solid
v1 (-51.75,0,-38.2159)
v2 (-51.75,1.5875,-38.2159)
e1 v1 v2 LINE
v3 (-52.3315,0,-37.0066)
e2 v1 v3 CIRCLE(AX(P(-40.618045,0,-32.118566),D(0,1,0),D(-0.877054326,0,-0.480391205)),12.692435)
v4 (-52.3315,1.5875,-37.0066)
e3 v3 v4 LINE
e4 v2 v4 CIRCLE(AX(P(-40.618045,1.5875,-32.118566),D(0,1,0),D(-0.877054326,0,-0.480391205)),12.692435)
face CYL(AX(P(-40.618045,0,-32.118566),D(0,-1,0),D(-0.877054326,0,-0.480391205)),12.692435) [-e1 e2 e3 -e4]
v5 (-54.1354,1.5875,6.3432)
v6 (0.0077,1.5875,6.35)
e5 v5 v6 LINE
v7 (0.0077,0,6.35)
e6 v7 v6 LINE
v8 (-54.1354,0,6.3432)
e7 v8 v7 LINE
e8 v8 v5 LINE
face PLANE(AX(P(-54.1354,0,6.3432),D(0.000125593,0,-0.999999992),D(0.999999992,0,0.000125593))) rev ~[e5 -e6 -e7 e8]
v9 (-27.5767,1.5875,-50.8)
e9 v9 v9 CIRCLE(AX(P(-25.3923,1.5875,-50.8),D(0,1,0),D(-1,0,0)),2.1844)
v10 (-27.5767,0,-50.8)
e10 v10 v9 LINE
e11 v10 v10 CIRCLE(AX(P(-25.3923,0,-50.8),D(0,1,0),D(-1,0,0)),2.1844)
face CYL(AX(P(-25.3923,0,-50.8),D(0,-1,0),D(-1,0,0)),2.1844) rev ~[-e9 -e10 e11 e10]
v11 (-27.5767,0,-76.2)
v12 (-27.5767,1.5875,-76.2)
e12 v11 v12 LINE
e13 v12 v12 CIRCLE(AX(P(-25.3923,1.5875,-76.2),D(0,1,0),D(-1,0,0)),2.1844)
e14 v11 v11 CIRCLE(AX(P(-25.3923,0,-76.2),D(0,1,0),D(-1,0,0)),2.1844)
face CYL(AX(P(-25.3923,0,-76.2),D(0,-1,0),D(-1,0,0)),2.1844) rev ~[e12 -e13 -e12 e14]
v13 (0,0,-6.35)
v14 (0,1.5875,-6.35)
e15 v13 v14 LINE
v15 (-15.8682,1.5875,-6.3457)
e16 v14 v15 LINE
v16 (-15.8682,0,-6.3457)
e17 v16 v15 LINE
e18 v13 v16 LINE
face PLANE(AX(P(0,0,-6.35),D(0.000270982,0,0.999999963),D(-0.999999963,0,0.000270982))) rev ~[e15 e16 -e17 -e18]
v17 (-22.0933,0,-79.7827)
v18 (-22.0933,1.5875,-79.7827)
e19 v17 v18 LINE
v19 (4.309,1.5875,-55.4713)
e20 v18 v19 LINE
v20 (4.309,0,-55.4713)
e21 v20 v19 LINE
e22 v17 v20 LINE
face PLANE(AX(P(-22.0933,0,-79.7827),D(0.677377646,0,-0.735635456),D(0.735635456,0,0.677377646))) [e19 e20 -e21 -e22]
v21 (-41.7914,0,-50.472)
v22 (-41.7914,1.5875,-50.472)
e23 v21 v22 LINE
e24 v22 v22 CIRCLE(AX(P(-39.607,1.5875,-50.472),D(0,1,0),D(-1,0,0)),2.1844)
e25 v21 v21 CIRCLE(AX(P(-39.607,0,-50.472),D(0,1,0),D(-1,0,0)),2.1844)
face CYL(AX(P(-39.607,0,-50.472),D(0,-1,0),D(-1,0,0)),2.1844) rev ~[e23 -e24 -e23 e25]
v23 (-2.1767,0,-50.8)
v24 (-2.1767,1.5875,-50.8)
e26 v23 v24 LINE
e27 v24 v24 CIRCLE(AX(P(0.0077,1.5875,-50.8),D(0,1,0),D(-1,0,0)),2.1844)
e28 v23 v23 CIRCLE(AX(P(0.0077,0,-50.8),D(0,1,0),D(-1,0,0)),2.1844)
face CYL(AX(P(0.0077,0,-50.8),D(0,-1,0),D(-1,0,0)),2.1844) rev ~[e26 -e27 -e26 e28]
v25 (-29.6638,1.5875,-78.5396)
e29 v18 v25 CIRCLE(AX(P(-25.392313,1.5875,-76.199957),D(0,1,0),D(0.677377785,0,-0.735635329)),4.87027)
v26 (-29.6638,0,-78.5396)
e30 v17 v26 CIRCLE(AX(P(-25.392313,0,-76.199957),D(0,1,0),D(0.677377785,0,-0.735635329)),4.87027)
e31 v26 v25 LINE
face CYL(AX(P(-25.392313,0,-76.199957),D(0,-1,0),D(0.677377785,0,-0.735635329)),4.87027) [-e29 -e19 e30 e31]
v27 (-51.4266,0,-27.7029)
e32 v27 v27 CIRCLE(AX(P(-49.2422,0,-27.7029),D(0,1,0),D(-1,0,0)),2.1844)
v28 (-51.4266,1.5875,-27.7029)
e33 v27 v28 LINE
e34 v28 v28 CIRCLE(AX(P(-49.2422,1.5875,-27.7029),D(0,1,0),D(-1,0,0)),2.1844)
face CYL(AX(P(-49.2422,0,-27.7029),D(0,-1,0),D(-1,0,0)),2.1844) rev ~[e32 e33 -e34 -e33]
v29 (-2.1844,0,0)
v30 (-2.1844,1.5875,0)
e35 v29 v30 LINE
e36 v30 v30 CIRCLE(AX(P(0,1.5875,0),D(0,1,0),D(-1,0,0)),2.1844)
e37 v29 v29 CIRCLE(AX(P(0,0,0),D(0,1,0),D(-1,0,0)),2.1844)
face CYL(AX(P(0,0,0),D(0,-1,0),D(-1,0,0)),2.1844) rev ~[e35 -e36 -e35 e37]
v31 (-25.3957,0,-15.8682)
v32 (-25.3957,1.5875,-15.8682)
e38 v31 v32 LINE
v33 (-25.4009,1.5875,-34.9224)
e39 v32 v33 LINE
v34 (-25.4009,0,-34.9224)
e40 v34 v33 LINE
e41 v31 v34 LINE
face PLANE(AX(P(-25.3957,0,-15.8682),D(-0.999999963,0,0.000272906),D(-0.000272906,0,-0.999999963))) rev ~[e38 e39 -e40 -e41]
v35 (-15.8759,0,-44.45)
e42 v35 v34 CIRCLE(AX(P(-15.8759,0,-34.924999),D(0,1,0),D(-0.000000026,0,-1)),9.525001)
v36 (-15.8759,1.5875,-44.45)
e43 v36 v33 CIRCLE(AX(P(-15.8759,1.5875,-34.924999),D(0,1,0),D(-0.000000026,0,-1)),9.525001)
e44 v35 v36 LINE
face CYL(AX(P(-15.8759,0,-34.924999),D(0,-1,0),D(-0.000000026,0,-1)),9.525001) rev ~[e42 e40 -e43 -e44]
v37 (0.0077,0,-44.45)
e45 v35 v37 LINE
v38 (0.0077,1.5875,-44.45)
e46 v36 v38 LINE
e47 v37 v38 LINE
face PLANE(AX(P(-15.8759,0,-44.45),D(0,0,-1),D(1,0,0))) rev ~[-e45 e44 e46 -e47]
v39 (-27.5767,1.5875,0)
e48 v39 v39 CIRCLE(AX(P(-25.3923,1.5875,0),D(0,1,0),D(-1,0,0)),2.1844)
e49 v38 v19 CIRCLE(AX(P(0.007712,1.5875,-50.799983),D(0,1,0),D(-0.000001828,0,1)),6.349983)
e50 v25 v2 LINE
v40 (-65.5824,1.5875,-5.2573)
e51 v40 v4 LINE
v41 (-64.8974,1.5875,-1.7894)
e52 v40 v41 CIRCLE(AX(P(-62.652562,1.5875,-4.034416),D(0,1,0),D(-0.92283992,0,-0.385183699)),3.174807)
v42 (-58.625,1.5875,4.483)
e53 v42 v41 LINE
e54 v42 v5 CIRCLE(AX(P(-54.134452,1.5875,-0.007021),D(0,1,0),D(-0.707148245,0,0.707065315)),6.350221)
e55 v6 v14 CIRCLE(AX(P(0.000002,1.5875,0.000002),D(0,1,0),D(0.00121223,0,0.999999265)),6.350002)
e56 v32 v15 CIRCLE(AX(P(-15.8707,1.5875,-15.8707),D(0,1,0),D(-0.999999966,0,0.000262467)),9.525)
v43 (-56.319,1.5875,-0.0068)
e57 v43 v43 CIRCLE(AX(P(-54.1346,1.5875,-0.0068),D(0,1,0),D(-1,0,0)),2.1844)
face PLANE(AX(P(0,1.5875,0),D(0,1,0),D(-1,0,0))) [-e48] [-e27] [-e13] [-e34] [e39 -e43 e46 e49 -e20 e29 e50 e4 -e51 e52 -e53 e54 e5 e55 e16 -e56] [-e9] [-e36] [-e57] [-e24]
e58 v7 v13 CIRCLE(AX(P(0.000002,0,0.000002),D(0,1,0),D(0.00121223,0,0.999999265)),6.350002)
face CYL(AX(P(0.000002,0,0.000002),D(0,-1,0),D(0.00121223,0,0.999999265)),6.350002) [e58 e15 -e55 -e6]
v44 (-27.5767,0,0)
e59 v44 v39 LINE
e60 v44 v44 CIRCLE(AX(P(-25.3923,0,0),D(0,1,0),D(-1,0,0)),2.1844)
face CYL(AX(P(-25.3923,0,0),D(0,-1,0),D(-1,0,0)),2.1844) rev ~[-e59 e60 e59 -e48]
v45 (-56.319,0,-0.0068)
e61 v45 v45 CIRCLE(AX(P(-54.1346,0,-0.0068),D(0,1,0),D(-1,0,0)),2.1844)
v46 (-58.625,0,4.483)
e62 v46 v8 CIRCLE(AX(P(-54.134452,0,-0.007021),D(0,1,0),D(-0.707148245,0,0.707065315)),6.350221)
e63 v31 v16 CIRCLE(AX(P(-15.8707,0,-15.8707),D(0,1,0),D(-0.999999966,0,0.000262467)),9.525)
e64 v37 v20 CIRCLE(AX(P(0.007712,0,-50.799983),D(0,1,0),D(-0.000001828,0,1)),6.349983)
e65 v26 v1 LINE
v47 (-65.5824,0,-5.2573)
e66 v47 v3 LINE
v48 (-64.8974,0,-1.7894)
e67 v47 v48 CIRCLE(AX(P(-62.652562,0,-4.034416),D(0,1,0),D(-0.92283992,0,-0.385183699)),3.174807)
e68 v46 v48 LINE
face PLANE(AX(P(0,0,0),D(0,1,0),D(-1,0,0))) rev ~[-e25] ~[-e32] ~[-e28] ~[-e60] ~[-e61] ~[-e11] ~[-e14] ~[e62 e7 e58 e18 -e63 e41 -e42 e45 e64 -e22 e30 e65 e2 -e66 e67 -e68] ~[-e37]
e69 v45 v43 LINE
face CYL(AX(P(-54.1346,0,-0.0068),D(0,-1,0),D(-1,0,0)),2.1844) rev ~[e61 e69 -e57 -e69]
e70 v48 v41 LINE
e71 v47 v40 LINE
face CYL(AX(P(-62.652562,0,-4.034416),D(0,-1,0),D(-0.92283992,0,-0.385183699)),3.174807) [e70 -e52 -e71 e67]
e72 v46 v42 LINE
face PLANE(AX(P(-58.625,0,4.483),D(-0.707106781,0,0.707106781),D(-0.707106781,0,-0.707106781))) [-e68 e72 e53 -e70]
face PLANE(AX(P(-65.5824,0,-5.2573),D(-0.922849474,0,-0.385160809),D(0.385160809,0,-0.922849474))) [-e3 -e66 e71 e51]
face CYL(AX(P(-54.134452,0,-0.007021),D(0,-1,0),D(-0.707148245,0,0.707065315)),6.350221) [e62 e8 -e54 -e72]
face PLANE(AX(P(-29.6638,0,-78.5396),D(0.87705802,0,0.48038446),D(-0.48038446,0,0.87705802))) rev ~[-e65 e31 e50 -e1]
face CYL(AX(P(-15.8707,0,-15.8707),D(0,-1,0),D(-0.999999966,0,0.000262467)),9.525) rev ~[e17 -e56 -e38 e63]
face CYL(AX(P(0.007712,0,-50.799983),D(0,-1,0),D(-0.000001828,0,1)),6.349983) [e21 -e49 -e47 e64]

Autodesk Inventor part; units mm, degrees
ref_plane "YZ Plane" through (0, 0, 0) normal (1, 0, 0) x (0, 1, 0)
ref_plane "XZ Plane" through (0, 0, 0) normal (0, 1, 0) x (-1, 0, 0)
ref_plane "XY Plane" through (0, 0, 0) normal (0, 0, 1) x (1, 0, 0)
sketch "main" plane through (0, 0, 0) normal (0, 0, 1) x (1, 0, 0)
  line L0 (12.0188, -14.2552) -> (34.1049, 26.0684)
  circle A0 centre (21.9619, 13.8124) radius 2.1844
  circle A1 centre (31.5972, 36.5815) radius 2.1844
  circle A2 centre (36.4896, 64.2776) radius 2.1844
  line L1 (36.4904, 70.6276) -> (-17.6528, 70.6344)
  circle A3 centre (7.7473, 64.2844) radius 2.1844
  line L2 (7.7507, 48.4162) -> (7.7558, 29.3619)
  arc A4 (7.7507, 48.4162) -> (-1.7768, 57.9386) centre (-1.7743, 48.4136) ccw
  arc A5 (-1.7692, 19.8344) -> (7.7558, 29.3619) centre (-1.7692, 29.3594) ccw
  line L3 (-17.645, 57.9344) -> (-1.7768, 57.9386)
  arc A6 (-17.6528, 70.6344) -> (-17.645, 57.9344) centre (-17.645, 64.2844) ccw
  arc A7 (-17.6527, 19.8344) -> (-21.9541, 8.8131) centre (-17.6527, 13.4844) ccw
  circle A8 centre (7.7473, 13.4844) radius 2.1844
  line L4 (-1.7692, 19.8344) -> (-17.6527, 19.8344)
  arc A9 (4.4483, -15.4983) -> (12.0188, -14.2552) centre (7.7473, -11.9156) ccw
  line L5 (4.4483, -15.4983) -> (-21.9541, 8.8131)
  circle A10 centre (7.7473, -11.9156) radius 2.1844
  circle A11 centre (-17.645, 64.2844) radius 2.1844
  circle A12 centre (-17.6527, 13.4844) radius 2.1844
  arc A13 (40.98, 68.7674) -> (36.4904, 70.6276) centre (36.4896, 64.2776) ccw
  line L6 (40.98, 68.7674) -> (47.2524, 62.495)
  line L7 (40.98, 68.7674) -> (49.8505, 68.7674) construction
  line L8 (47.9374, 59.0271) -> (34.6865, 27.2778)
  arc A14 (34.1049, 26.0684) -> (34.6865, 27.2778) centre (22.9663, 32.1693) ccw
  arc A15 (47.9374, 59.0271) -> (47.2524, 62.495) centre (45.0073, 60.25) ccw
  point P0 (10.5119, 26.5593)
  point P1 (34.4277, 26.6577)
  dimension "d1" = 9.7405
  dimension "d2" = 4.3688
  dimension "d3" = 4.3688
  dimension "d4" = 4.3688
  dimension "d5" = 4.3688
  dimension "d6" = 4.3688
  dimension "d10" = 50.8
  dimension "d11" = 50.8
  dimension "d13" = 6.35
  dimension "d20" = 45
  dimension "d21" = 12.7
  dimension "d22" = 3.175
sketch "Sketch1" plane through (0, 0, 0) normal (0, 1, 0) x (-1, 0, 0)
  line L0 (29.6638, -78.5396) -> (51.75, -38.2159)
  circle A0 centre (39.607, -50.472) radius 2.1844
  circle A1 centre (49.2422, -27.7029) radius 2.1844
  circle A2 centre (54.1346, -0.0068) radius 2.1844
  line L1 (54.1354, 6.3432) -> (-0.0077, 6.35)
  circle A3 centre (25.3923, 0) radius 2.1844
  line L2 (25.3957, -15.8682) -> (25.4009, -34.9224)
  arc A4 (25.3957, -15.8682) -> (15.8682, -6.3457) centre (15.8707, -15.8707) ccw
  arc A5 (15.8759, -44.45) -> (25.4009, -34.9224) centre (15.8759, -34.925) ccw
  line L3 (0, -6.35) -> (15.8682, -6.3457)
  arc A6 (-0.0077, 6.35) -> (0, -6.35) centre (0, 0) ccw
  arc A7 (-0.0077, -44.45) -> (-4.309, -55.4713) centre (-0.0077, -50.8) ccw
  circle A8 centre (25.3923, -50.8) radius 2.1844
  line L4 (15.8759, -44.45) -> (-0.0077, -44.45)
  arc A9 (22.0933, -79.7827) -> (29.6638, -78.5396) centre (25.3923, -76.2) ccw
  line L5 (22.0933, -79.7827) -> (-4.309, -55.4713)
  circle A10 centre (25.3923, -76.2) radius 2.1844
  circle A11 centre (0, 0) radius 2.1844
  circle A12 centre (-0.0077, -50.8) radius 2.1844
  arc A13 (58.625, 4.483) -> (54.1354, 6.3432) centre (54.1346, -0.0068) ccw
  line L6 (58.625, 4.483) -> (64.8974, -1.7894)
  line L7 (58.625, 4.483) -> (67.4955, 4.483) construction
  line L8 (65.5824, -5.2573) -> (52.3315, -37.0066)
  arc A14 (51.75, -38.2159) -> (52.3315, -37.0066) centre (40.6113, -32.1151) ccw
  arc A15 (65.5824, -5.2573) -> (64.8974, -1.7894) centre (62.6524, -4.0344) ccw
extrude "Extrusion1" add sketch "Sketch1" along normal blind 1.5875
properties part number "Funnel Gusset Back Improved V2" material "Acetal Resin, White"
